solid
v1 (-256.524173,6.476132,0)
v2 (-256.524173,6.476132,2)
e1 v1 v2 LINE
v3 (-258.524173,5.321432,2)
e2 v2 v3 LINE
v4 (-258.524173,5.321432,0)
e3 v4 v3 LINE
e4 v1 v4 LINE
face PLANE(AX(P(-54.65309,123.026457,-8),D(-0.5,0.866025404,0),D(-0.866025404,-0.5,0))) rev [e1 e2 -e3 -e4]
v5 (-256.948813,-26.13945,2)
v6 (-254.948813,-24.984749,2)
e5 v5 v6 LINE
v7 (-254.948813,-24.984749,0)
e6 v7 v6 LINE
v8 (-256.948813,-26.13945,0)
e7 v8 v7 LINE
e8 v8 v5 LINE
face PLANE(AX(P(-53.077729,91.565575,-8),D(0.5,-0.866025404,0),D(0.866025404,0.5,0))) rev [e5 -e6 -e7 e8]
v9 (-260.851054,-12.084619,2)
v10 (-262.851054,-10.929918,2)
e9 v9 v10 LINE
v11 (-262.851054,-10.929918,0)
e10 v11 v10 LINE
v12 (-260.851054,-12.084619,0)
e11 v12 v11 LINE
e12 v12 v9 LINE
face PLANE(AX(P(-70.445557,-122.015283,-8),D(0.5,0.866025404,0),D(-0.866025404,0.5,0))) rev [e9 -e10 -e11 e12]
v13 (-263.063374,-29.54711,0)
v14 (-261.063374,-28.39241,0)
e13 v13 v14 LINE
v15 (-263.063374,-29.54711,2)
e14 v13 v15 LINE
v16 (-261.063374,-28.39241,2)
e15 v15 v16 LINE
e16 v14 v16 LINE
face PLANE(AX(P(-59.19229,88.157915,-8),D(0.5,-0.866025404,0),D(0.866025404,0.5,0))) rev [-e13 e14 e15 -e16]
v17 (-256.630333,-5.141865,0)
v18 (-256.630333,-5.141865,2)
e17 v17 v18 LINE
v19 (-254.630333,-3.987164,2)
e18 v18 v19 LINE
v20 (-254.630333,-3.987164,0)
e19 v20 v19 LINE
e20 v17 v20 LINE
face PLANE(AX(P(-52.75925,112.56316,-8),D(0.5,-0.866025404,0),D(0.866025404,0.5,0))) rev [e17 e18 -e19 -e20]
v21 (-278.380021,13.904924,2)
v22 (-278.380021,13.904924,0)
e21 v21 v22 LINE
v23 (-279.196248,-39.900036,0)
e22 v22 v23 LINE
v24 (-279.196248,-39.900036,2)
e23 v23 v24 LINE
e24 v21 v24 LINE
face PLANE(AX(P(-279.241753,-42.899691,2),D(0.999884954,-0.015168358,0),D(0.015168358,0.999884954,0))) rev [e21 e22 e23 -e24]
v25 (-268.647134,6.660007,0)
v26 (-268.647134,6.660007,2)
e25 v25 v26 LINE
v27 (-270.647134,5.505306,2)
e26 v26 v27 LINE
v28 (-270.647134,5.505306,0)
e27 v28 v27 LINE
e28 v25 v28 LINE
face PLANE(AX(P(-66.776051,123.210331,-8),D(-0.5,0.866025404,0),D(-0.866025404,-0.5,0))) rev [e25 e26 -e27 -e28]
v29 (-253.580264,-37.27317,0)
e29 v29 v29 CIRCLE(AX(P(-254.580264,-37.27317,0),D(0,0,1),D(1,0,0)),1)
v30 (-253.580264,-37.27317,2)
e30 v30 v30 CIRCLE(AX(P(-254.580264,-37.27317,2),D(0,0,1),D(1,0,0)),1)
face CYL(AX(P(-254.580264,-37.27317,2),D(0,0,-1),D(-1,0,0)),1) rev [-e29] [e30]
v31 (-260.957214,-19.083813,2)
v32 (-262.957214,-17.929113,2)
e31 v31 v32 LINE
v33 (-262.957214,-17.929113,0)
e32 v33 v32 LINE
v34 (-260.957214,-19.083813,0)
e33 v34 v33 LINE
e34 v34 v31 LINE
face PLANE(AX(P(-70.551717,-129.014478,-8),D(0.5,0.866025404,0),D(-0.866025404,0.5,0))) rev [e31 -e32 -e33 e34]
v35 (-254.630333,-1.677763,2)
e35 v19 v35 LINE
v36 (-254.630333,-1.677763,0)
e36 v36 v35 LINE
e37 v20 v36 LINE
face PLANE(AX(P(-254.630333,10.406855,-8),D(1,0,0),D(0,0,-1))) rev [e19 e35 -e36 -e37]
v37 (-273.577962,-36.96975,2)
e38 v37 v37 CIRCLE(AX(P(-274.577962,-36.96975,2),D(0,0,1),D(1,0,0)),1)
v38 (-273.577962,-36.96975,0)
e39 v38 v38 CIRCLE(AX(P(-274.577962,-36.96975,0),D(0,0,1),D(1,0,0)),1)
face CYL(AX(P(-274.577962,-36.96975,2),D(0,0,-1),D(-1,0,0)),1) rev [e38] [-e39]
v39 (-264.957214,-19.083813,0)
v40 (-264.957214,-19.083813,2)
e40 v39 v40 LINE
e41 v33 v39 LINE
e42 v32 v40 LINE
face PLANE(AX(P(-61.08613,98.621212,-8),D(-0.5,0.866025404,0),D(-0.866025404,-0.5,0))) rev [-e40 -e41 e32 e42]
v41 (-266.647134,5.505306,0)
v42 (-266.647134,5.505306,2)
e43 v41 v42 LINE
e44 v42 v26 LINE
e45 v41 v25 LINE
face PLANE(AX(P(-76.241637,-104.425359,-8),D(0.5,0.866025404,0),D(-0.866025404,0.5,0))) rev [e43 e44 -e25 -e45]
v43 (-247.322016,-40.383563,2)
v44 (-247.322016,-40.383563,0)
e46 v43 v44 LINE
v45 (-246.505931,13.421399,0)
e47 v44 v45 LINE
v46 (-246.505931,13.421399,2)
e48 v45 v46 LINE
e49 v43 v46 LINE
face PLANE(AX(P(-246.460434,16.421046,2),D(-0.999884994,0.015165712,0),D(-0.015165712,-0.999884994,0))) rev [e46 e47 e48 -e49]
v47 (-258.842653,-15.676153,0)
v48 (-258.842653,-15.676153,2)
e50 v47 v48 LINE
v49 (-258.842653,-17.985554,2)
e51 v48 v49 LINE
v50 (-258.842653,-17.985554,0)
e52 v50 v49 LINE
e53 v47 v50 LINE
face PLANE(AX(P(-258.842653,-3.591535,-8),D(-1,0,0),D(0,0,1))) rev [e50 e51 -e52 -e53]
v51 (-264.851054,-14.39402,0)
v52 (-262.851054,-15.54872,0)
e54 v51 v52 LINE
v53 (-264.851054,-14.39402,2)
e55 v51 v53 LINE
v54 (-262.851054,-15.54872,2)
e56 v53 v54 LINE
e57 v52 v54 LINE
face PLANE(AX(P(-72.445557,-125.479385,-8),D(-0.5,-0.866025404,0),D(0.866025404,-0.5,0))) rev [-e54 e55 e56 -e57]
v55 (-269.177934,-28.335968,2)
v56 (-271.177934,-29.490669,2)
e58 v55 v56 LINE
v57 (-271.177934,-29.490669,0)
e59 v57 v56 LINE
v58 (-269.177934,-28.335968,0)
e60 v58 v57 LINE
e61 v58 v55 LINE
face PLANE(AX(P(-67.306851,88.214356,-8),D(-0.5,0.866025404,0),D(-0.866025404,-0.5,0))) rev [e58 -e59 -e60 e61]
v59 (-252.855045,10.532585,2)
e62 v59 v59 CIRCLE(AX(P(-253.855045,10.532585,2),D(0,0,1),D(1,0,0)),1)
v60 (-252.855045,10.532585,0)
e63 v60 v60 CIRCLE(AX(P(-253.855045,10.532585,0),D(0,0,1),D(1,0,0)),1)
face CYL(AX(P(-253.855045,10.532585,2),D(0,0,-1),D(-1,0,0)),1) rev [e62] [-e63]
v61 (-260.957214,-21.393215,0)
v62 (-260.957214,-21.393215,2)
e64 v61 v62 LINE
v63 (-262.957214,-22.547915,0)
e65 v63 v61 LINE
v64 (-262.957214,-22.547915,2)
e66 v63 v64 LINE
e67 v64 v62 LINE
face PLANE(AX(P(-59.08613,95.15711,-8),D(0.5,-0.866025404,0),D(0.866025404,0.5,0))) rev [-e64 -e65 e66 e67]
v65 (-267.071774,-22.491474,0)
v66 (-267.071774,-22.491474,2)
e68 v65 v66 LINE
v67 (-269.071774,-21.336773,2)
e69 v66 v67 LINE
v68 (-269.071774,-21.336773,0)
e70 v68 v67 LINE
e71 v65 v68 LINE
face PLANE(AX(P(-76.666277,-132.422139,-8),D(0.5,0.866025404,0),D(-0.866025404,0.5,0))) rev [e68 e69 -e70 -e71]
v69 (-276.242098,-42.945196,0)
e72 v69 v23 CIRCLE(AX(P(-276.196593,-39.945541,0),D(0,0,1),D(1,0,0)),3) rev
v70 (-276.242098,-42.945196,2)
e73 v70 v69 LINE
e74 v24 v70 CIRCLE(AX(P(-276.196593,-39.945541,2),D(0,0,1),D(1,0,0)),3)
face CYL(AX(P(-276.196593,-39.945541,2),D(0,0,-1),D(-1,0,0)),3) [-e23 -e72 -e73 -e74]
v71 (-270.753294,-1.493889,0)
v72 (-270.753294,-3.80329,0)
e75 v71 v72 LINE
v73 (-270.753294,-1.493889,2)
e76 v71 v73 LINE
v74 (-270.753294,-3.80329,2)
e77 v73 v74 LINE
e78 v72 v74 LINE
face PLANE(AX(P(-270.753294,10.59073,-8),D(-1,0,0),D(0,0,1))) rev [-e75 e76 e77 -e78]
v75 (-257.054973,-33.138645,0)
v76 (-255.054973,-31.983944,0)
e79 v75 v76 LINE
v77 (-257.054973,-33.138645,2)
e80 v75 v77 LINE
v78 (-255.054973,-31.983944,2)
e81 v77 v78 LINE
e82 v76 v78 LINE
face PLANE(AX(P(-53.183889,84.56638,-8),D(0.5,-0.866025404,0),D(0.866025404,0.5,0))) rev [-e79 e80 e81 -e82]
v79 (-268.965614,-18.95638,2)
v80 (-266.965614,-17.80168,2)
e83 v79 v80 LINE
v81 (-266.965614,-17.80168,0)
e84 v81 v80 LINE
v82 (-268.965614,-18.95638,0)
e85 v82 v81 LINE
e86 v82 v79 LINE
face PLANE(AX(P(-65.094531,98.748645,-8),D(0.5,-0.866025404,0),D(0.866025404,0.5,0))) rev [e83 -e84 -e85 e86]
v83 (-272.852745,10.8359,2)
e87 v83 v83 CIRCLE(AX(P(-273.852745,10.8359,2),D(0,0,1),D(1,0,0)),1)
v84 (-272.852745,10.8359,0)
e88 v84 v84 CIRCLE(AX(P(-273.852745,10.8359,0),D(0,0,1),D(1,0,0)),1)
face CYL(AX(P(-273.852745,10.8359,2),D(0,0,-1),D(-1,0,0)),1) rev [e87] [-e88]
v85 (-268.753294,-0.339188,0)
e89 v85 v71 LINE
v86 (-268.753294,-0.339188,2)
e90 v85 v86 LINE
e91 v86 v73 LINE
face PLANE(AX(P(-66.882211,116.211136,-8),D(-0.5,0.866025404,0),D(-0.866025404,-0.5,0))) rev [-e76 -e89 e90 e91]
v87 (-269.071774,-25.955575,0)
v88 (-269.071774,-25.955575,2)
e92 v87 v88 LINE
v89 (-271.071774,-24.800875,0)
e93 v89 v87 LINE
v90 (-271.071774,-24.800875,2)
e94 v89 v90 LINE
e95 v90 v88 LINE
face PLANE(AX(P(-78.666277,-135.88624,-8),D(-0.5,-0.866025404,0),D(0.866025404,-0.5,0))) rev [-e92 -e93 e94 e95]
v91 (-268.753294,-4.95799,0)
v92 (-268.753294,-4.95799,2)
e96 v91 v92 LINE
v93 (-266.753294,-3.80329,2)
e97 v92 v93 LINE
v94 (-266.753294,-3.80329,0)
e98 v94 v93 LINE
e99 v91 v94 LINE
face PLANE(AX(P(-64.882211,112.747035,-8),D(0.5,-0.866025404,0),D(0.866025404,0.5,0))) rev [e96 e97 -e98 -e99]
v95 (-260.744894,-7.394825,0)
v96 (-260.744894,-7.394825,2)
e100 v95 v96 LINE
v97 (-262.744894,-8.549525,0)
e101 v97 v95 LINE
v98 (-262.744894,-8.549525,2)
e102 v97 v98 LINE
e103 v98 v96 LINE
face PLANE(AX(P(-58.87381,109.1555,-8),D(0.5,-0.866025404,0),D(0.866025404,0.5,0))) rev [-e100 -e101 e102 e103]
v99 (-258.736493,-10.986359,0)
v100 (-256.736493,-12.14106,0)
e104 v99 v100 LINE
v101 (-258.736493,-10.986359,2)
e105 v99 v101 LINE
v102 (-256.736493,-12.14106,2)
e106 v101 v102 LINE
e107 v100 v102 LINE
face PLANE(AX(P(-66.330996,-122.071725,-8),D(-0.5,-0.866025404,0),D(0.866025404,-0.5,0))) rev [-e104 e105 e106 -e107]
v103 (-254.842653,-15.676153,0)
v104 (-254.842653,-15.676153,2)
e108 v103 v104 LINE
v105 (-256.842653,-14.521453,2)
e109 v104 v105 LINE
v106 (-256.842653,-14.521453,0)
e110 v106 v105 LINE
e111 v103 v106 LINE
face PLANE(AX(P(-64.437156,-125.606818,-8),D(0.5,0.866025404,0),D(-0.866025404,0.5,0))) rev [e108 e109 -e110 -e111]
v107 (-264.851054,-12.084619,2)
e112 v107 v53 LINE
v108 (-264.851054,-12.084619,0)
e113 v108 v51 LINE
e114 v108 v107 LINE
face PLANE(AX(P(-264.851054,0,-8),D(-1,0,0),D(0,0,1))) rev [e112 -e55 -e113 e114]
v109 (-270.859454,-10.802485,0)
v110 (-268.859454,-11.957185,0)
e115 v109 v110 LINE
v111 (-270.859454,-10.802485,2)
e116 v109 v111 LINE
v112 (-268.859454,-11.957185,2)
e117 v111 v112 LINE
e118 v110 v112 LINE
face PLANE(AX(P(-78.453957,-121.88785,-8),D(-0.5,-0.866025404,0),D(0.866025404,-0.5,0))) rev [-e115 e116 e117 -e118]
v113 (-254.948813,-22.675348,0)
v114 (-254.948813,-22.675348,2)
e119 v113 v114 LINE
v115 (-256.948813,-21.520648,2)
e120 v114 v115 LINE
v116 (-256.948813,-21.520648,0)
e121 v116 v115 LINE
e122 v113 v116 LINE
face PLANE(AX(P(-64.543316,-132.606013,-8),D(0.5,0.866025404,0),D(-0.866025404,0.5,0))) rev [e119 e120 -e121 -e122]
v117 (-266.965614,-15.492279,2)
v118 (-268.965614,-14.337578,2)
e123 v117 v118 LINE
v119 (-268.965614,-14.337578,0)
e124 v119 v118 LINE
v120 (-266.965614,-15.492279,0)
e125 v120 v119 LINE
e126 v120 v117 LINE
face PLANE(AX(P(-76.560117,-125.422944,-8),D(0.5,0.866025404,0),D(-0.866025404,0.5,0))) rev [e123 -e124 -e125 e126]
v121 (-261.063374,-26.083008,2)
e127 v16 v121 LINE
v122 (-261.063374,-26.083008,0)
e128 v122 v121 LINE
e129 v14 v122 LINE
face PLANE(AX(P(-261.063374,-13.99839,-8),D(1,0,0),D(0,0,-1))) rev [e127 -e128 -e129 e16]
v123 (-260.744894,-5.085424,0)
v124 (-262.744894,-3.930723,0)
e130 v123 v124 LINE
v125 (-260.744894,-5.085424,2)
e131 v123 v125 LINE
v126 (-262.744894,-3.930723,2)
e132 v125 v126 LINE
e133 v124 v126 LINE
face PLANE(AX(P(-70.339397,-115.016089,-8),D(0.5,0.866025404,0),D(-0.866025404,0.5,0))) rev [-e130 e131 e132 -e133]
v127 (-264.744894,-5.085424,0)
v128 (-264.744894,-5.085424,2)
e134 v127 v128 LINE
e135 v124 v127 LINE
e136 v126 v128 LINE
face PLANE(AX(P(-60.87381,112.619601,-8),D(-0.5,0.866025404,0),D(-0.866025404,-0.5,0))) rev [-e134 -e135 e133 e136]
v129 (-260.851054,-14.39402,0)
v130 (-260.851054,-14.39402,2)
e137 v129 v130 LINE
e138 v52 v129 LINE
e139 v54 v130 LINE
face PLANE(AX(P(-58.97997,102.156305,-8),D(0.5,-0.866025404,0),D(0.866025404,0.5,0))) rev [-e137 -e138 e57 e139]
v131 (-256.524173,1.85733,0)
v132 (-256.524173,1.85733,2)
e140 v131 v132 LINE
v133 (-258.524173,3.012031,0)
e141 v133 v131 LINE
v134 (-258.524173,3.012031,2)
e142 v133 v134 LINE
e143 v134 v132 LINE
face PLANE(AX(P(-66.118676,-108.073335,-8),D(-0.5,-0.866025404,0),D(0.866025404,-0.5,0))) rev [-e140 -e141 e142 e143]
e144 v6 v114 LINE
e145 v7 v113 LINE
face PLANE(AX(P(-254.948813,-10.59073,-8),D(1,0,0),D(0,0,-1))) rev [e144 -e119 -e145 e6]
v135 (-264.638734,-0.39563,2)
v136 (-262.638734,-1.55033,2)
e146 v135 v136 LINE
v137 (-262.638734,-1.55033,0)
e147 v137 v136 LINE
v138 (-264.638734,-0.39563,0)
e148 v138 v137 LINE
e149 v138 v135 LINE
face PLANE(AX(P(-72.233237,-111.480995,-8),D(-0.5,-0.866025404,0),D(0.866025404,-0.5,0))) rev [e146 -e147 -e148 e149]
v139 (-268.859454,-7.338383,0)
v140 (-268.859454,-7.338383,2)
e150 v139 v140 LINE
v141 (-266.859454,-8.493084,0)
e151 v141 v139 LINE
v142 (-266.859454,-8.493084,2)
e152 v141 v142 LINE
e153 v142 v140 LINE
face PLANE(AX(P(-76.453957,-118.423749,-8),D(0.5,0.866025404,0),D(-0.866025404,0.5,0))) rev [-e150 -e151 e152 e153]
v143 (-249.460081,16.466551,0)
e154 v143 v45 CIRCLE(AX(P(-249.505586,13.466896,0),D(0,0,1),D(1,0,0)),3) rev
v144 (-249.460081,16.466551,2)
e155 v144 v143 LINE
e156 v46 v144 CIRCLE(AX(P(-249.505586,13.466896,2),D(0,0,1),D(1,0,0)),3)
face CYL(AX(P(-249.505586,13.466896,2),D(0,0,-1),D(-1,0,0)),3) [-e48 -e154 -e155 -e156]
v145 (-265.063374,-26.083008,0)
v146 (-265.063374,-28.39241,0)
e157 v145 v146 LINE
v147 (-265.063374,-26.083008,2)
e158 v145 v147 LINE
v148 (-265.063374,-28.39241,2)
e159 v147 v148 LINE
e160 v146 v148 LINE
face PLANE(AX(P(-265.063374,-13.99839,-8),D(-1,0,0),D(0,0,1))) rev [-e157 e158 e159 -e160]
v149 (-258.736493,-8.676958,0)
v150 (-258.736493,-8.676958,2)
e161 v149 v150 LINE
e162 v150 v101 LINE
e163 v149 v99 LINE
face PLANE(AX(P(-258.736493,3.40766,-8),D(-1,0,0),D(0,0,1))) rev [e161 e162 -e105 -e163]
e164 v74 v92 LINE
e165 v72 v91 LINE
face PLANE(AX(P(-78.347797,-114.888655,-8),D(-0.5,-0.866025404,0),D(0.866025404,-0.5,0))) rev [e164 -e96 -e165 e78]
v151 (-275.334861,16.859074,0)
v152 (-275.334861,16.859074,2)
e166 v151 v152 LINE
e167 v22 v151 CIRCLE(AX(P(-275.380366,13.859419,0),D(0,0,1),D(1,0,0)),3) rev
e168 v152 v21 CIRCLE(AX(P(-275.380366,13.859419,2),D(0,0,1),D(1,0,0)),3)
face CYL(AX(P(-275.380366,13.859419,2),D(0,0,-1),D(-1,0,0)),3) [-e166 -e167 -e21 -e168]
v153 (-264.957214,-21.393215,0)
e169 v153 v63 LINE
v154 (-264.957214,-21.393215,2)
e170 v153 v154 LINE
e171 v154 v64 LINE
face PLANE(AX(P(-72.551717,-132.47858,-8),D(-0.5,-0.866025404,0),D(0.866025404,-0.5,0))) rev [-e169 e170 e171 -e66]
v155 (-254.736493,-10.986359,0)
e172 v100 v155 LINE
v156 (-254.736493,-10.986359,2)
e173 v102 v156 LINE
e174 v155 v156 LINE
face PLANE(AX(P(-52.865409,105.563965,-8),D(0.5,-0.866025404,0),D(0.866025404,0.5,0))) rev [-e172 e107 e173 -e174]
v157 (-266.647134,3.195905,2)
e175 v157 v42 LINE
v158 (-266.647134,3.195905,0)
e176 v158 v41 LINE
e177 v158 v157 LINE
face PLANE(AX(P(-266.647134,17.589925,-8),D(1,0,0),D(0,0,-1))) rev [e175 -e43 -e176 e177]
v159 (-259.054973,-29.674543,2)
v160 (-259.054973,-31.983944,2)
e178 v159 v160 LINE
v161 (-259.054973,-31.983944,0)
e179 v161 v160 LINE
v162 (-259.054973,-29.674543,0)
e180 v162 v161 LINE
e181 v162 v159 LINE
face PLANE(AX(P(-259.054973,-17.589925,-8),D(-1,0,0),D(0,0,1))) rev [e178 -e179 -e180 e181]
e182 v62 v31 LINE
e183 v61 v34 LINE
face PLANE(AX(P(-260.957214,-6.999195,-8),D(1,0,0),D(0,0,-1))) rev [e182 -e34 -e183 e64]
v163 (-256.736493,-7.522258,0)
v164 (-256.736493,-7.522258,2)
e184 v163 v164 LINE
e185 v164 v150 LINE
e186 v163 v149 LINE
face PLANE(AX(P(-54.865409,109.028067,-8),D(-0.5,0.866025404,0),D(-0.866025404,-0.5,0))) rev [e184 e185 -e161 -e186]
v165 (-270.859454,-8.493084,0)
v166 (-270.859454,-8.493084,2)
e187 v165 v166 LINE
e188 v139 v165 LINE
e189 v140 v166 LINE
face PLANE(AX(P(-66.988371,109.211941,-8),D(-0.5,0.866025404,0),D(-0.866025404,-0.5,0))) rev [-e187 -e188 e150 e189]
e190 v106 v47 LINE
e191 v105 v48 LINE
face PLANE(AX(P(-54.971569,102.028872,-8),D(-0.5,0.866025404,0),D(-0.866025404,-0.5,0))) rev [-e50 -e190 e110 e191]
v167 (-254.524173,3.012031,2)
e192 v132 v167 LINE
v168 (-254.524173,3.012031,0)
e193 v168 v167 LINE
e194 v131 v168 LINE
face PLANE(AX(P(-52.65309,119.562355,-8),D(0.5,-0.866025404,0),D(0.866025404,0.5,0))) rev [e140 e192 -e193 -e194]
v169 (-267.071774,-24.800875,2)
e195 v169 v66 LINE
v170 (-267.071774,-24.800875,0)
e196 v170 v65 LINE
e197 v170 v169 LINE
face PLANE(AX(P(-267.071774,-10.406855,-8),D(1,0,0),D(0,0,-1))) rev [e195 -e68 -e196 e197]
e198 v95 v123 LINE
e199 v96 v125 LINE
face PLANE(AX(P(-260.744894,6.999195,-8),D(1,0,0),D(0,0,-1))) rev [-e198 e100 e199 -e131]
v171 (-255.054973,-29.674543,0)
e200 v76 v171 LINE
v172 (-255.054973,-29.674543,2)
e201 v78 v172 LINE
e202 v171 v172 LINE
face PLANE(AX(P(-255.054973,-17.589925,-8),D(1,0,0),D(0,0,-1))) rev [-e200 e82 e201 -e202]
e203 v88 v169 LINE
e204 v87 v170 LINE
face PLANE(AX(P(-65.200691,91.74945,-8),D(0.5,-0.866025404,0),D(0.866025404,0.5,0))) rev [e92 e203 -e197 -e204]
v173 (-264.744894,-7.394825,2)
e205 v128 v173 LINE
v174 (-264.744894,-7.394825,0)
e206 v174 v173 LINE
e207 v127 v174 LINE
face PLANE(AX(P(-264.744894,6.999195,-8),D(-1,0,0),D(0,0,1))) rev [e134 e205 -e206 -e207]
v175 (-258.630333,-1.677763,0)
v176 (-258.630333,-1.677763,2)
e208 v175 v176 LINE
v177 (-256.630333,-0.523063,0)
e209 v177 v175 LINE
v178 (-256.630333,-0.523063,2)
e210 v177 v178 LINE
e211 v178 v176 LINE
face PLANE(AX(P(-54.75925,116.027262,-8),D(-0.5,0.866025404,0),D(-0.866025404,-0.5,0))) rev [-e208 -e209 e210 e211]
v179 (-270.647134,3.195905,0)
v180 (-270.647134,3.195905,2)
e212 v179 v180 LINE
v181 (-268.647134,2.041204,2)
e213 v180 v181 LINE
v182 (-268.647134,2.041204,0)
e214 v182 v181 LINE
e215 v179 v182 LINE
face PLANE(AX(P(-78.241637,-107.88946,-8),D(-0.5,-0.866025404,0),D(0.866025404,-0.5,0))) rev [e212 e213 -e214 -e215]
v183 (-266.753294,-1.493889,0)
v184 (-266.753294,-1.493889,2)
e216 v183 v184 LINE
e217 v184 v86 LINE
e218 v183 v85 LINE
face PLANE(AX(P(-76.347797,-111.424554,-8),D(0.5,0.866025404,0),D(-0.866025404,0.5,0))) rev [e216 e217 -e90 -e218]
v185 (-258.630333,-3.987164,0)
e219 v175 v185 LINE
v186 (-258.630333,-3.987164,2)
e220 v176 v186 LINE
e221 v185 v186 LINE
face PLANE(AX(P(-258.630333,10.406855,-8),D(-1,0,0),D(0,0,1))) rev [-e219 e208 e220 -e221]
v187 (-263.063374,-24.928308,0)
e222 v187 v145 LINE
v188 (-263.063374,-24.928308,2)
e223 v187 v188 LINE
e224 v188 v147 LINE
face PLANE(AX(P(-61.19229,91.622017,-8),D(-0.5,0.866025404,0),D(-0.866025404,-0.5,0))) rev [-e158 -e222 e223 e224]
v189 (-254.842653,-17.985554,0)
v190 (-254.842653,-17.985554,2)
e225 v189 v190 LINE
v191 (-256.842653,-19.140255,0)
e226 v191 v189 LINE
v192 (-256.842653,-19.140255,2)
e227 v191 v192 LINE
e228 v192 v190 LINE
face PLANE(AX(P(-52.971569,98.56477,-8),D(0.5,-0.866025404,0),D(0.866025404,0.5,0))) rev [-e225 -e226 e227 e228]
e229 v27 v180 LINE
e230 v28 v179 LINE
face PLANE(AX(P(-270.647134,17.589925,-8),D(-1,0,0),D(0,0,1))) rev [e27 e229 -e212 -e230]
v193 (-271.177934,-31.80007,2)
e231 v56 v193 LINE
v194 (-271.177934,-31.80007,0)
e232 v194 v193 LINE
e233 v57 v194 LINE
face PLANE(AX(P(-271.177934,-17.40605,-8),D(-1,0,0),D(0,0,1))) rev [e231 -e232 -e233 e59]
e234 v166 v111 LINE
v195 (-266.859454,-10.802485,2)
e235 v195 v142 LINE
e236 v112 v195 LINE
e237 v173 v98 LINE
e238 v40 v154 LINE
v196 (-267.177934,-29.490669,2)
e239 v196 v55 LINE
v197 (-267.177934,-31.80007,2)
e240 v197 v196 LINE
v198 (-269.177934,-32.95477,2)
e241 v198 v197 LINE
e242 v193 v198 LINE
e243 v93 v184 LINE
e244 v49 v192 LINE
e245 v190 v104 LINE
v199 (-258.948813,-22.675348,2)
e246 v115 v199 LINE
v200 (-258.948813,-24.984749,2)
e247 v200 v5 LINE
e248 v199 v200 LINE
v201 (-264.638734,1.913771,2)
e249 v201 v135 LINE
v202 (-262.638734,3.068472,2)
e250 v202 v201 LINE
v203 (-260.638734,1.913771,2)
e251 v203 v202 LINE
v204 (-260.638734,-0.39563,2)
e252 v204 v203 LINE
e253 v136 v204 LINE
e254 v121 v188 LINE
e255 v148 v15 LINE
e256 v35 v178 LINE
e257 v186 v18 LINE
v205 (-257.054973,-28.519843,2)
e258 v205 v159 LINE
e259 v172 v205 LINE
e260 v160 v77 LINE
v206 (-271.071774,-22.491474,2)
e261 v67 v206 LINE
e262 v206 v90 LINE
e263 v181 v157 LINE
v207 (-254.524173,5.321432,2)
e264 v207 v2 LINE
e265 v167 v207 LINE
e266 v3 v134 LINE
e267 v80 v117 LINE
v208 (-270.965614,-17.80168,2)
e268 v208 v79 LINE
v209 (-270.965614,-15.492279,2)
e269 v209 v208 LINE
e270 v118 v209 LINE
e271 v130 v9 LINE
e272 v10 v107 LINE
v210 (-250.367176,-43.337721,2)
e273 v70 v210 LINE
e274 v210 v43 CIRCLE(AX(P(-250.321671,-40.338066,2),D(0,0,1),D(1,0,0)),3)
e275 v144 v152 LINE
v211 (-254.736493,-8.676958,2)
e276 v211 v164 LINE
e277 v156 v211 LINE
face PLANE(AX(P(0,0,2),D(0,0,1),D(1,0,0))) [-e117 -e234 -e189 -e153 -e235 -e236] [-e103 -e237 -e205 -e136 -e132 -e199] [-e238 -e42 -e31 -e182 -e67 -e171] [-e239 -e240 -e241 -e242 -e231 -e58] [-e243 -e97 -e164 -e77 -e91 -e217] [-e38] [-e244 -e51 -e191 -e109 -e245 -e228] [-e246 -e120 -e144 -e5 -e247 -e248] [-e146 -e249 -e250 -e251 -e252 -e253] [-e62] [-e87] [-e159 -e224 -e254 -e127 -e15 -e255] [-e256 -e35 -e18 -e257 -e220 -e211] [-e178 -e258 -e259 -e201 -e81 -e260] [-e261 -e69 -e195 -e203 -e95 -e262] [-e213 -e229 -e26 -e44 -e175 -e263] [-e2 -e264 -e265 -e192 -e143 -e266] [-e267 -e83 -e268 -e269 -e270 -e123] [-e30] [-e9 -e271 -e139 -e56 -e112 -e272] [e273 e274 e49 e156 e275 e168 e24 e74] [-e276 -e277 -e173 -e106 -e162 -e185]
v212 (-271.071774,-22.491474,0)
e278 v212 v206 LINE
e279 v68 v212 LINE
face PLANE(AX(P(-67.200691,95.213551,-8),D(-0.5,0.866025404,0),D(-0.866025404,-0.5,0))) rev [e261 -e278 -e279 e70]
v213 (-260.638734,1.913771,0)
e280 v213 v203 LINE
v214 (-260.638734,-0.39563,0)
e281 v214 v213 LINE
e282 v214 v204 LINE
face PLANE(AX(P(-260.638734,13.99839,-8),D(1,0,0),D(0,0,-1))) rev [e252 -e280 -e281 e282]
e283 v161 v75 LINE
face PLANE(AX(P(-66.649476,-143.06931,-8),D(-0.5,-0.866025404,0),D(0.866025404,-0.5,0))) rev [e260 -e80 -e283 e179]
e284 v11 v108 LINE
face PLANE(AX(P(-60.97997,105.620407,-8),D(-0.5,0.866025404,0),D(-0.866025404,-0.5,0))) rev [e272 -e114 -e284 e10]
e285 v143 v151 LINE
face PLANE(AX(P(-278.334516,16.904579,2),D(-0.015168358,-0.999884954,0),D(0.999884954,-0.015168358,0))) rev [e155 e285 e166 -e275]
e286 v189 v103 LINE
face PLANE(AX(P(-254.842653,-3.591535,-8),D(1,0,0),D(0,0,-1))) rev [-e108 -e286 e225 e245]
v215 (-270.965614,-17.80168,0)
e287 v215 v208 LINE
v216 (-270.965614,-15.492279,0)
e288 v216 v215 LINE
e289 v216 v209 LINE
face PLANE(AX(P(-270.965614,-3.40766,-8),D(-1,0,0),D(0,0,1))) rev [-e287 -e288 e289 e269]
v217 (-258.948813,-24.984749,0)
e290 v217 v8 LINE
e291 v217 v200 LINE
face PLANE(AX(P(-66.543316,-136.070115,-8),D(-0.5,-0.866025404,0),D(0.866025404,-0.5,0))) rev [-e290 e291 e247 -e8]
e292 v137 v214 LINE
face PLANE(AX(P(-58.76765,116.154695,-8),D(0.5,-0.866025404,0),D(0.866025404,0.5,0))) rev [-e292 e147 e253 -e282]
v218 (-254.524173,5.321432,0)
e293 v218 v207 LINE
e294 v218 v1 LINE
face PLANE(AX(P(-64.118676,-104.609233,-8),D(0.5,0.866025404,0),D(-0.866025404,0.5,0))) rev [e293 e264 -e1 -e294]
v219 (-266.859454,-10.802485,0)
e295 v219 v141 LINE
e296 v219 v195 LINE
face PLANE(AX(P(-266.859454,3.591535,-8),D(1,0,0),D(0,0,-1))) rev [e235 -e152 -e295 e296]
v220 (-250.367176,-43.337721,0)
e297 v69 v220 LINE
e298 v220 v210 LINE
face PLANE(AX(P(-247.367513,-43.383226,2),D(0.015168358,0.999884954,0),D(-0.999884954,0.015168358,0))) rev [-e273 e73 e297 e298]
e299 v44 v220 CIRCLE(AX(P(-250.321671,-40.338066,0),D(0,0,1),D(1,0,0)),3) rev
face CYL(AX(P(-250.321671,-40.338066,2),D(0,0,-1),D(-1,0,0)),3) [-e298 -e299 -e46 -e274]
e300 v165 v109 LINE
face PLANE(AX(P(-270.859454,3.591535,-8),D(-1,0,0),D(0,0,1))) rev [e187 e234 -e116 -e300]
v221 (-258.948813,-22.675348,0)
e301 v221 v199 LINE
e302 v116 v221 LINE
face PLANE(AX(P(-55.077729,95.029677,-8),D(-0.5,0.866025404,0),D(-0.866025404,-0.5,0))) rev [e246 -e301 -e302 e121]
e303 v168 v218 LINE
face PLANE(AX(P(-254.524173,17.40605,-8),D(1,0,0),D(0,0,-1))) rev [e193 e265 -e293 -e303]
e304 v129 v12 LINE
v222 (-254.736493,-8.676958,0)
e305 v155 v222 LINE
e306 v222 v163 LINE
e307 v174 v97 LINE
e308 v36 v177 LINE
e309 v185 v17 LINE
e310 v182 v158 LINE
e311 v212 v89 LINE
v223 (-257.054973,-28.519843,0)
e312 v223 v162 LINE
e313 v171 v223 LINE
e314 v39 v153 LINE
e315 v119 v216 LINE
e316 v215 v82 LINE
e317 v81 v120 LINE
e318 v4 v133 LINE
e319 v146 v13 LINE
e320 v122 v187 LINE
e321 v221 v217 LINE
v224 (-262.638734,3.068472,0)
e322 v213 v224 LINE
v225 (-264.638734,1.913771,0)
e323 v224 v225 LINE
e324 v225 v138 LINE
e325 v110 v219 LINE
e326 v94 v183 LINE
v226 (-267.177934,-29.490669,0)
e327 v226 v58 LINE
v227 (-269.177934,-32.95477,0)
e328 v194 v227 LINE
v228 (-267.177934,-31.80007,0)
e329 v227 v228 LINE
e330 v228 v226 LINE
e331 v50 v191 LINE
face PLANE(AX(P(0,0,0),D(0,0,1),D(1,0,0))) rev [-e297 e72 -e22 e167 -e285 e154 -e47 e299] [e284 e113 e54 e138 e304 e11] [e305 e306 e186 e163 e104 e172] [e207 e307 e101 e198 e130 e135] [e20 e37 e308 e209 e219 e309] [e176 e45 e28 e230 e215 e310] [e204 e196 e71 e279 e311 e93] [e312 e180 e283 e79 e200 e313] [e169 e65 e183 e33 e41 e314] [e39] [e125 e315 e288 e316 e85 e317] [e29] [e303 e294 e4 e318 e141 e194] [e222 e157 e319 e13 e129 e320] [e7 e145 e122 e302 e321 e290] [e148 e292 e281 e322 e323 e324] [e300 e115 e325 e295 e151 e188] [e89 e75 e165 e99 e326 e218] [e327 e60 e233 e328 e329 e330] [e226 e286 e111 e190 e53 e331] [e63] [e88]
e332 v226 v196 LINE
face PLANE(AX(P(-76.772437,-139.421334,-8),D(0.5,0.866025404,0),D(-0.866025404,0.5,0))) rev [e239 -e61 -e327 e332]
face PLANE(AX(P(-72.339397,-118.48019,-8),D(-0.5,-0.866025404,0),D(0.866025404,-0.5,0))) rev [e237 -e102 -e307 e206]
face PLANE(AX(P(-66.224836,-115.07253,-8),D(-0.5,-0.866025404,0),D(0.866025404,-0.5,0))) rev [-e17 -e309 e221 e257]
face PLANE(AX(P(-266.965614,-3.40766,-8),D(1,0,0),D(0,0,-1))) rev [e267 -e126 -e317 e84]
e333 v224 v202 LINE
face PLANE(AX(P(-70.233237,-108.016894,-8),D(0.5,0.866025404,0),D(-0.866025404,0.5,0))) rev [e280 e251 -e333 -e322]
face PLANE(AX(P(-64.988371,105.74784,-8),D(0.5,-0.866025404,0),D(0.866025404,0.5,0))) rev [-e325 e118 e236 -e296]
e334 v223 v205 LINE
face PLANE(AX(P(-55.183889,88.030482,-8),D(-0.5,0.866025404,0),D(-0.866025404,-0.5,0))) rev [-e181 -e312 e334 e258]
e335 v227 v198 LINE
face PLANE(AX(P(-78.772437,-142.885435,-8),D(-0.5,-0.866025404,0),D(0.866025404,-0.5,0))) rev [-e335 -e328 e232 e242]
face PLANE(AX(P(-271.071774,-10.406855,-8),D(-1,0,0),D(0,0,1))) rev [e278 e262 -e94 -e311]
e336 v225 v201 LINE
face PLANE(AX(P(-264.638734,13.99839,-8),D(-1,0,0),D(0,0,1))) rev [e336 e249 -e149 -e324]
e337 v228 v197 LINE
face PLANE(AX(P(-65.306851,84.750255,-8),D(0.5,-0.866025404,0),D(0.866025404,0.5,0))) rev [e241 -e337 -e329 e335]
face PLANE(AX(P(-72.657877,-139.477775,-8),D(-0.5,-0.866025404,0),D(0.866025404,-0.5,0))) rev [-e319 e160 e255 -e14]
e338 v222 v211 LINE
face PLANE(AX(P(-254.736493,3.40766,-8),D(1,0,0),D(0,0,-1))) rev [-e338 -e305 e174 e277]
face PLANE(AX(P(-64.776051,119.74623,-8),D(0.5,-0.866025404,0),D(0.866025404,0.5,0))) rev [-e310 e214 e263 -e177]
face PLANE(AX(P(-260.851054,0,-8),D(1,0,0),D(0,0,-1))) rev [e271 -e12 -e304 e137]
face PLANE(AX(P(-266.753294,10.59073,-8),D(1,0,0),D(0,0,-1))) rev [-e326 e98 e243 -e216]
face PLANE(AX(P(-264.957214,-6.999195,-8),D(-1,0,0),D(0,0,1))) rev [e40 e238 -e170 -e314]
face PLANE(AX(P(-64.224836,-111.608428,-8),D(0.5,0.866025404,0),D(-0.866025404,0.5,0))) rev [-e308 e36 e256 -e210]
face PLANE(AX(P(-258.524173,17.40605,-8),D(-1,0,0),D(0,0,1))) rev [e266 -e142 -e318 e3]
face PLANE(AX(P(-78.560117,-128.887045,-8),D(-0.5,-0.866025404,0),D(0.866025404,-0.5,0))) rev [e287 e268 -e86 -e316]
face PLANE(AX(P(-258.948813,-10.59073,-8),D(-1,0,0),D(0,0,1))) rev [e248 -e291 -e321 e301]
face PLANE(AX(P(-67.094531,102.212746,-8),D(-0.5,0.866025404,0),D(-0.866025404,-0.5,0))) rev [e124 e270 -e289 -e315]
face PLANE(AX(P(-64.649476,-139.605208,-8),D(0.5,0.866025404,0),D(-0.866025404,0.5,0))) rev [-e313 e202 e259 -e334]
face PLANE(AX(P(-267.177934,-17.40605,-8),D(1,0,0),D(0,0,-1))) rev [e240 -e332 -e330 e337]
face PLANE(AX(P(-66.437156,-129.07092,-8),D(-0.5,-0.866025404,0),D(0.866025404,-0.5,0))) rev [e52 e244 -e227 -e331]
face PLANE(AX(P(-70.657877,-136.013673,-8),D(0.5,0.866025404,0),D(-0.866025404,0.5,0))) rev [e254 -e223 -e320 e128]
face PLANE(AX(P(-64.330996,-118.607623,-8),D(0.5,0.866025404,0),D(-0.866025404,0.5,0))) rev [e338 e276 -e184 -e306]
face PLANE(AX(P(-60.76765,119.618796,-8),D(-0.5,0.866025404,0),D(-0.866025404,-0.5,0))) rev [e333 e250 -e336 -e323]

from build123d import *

# Parameters (mm, degrees)
SKETCH_1_R          = 1
EXTRUDE_1_DEPTH     = 2
FILLET_1_R          = 3
CUT_EXTRUDE_1_DEPTH = 10
OTHER_1_DEPTH       = 2


# Read off the part's stored shape, not the designer's step: 填充阵列1
with BuildPart() as part:
    # 草图1 → 凸台-拉伸1 (new body)
    with BuildSketch(Plane.XY):
        Polygon((-246.460434143, 16.421045692), (-247.367512812, -43.383226063), (-279.241752663, -42.899690556), (-278.334515728, 16.904578798), align=None)
        with Locations((-273.852745372, 10.835899523)):
            Circle(SKETCH_1_R, mode=Mode.SUBTRACT)
        with Locations((-253.855045493, 10.532585287)):
            Circle(SKETCH_1_R, mode=Mode.SUBTRACT)
        with Locations((-254.580263739, -37.273170465)):
            Circle(SKETCH_1_R, mode=Mode.SUBTRACT)
        with Locations((-274.577962013, -36.969750385)):
            Circle(SKETCH_1_R, mode=Mode.SUBTRACT)
    extrude(amount=EXTRUDE_1_DEPTH)

    # 圆角1
    fillet_1_edges = [part.edges().sort_by_distance(p)[0] for p in [
        (-246.460434143, 16.421045692, 1),
        (-247.367512812, -43.383226063, 1),
        (-279.241752663, -42.899690556, 1),
        (-278.334515728, 16.904578798, 1),
    ]]
    fillet(fillet_1_edges, radius=FILLET_1_R)

    # 草图2 → 切除-拉伸1 (cut)
    with BuildSketch(Plane.XY.offset(2)):
        Polygon((-260.851053776, -13.269658771), (-264.851053776, -13.208979355), (-264.851053776, -14.394019601), (-262.851053776, -15.54872014), (-260.851053776, -14.394019601), align=None)
        Polygon((-264.851053776, -12.084618525), (-264.851053776, -13.208979355), (-260.851053776, -13.269658771), (-260.851053776, -12.084618525), (-262.851053776, -10.929917986), align=None)
    extrude(amount=-CUT_EXTRUDE_1_DEPTH, mode=Mode.SUBTRACT)

    # 填充阵列1 outline → 填充阵列1 (cut)
    with BuildSketch(Plane.XY):
        Polygon((-258.52417318, 5.321431628), (-258.52417318, 3.012030551), (-256.52417318, 1.857330013), (-254.52417318, 3.012030551), (-254.52417318, 5.321431628), (-256.52417318, 6.476132167), align=None)
        Polygon((-271.07177439, -22.49147372), (-271.07177439, -24.800874796), (-269.07177439, -25.955575335), (-267.07177439, -24.800874796), (-267.07177439, -22.49147372), (-269.07177439, -21.336773181), align=None)
        Polygon((-258.94881311, -22.675348203), (-258.94881311, -24.98474928), (-256.94881311, -26.139449818), (-254.94881311, -24.98474928), (-254.94881311, -22.675348203), (-256.94881311, -21.520647665), align=None)
        Polygon((-264.957213759, -19.083813483), (-264.957213759, -21.393214559), (-262.957213759, -22.547915098), (-260.957213759, -21.393214559), (-260.957213759, -19.083813483), (-262.957213759, -17.929112944), align=None)
        Polygon((-270.965614407, -15.492278762), (-270.965614407, -17.801679839), (-268.965614407, -18.956380377), (-266.965614407, -17.801679839), (-266.965614407, -15.492278762), (-268.965614407, -14.337578223), align=None)
        Polygon((-265.063373741, -26.08300844), (-265.063373741, -28.392409517), (-263.063373741, -29.547110056), (-261.063373741, -28.392409517), (-261.063373741, -26.08300844), (-263.063373741, -24.928307902), align=None)
        Polygon((-259.054973093, -29.674543161), (-259.054973093, -31.983944238), (-257.054973093, -33.138644776), (-255.054973093, -31.983944238), (-255.054973093, -29.674543161), (-257.054973093, -28.519842623), align=None)
        Polygon((-271.177934372, -29.490668678), (-271.177934372, -31.800069754), (-269.177934372, -32.954770293), (-267.177934372, -31.800069754), (-267.177934372, -29.490668678), (-269.177934372, -28.335968139), align=None)
        Polygon((-270.753294442, -1.493888846), (-270.753294442, -3.803289923), (-268.753294442, -4.957990461), (-266.753294442, -3.803289923), (-266.753294442, -1.493888846), (-268.753294442, -0.339188308), align=None)
        Polygon((-258.630333163, -1.67776333), (-258.630333163, -3.987164406), (-256.630333163, -5.141864945), (-254.630333163, -3.987164406), (-254.630333163, -1.67776333), (-256.630333163, -0.523062791), align=None)
        Polygon((-264.638733811, 1.913771391), (-264.638733811, -0.395629686), (-262.638733811, -1.550330224), (-260.638733811, -0.395629686), (-260.638733811, 1.913771391), (-262.638733811, 3.068471929), align=None)
        Polygon((-270.647134459, 5.505306112), (-270.647134459, 3.195905035), (-268.647134459, 2.041204497), (-266.647134459, 3.195905035), (-266.647134459, 5.505306112), (-268.647134459, 6.66000665), align=None)
        Polygon((-258.842653128, -15.676153245), (-258.842653128, -17.985554322), (-256.842653128, -19.14025486), (-254.842653128, -17.985554322), (-254.842653128, -15.676153245), (-256.842653128, -14.521452707), align=None)
        Polygon((-270.859454424, -8.493083804), (-270.859454424, -10.802484881), (-268.859454424, -11.957185419), (-266.859454424, -10.802484881), (-266.859454424, -8.493083804), (-268.859454424, -7.338383266), align=None)
        Polygon((-258.736493145, -8.676958287), (-258.736493145, -10.986359364), (-256.736493145, -12.141059903), (-254.736493145, -10.986359364), (-254.736493145, -8.676958287), (-256.736493145, -7.522257749), align=None)
        Polygon((-264.744893794, -5.085423567), (-264.744893794, -7.394824644), (-262.744893794, -8.549525182), (-260.744893794, -7.394824644), (-260.744893794, -5.085423567), (-262.744893794, -3.930723028), align=None)
    extrude(amount=OTHER_1_DEPTH, mode=Mode.SUBTRACT)


solid = part.part
